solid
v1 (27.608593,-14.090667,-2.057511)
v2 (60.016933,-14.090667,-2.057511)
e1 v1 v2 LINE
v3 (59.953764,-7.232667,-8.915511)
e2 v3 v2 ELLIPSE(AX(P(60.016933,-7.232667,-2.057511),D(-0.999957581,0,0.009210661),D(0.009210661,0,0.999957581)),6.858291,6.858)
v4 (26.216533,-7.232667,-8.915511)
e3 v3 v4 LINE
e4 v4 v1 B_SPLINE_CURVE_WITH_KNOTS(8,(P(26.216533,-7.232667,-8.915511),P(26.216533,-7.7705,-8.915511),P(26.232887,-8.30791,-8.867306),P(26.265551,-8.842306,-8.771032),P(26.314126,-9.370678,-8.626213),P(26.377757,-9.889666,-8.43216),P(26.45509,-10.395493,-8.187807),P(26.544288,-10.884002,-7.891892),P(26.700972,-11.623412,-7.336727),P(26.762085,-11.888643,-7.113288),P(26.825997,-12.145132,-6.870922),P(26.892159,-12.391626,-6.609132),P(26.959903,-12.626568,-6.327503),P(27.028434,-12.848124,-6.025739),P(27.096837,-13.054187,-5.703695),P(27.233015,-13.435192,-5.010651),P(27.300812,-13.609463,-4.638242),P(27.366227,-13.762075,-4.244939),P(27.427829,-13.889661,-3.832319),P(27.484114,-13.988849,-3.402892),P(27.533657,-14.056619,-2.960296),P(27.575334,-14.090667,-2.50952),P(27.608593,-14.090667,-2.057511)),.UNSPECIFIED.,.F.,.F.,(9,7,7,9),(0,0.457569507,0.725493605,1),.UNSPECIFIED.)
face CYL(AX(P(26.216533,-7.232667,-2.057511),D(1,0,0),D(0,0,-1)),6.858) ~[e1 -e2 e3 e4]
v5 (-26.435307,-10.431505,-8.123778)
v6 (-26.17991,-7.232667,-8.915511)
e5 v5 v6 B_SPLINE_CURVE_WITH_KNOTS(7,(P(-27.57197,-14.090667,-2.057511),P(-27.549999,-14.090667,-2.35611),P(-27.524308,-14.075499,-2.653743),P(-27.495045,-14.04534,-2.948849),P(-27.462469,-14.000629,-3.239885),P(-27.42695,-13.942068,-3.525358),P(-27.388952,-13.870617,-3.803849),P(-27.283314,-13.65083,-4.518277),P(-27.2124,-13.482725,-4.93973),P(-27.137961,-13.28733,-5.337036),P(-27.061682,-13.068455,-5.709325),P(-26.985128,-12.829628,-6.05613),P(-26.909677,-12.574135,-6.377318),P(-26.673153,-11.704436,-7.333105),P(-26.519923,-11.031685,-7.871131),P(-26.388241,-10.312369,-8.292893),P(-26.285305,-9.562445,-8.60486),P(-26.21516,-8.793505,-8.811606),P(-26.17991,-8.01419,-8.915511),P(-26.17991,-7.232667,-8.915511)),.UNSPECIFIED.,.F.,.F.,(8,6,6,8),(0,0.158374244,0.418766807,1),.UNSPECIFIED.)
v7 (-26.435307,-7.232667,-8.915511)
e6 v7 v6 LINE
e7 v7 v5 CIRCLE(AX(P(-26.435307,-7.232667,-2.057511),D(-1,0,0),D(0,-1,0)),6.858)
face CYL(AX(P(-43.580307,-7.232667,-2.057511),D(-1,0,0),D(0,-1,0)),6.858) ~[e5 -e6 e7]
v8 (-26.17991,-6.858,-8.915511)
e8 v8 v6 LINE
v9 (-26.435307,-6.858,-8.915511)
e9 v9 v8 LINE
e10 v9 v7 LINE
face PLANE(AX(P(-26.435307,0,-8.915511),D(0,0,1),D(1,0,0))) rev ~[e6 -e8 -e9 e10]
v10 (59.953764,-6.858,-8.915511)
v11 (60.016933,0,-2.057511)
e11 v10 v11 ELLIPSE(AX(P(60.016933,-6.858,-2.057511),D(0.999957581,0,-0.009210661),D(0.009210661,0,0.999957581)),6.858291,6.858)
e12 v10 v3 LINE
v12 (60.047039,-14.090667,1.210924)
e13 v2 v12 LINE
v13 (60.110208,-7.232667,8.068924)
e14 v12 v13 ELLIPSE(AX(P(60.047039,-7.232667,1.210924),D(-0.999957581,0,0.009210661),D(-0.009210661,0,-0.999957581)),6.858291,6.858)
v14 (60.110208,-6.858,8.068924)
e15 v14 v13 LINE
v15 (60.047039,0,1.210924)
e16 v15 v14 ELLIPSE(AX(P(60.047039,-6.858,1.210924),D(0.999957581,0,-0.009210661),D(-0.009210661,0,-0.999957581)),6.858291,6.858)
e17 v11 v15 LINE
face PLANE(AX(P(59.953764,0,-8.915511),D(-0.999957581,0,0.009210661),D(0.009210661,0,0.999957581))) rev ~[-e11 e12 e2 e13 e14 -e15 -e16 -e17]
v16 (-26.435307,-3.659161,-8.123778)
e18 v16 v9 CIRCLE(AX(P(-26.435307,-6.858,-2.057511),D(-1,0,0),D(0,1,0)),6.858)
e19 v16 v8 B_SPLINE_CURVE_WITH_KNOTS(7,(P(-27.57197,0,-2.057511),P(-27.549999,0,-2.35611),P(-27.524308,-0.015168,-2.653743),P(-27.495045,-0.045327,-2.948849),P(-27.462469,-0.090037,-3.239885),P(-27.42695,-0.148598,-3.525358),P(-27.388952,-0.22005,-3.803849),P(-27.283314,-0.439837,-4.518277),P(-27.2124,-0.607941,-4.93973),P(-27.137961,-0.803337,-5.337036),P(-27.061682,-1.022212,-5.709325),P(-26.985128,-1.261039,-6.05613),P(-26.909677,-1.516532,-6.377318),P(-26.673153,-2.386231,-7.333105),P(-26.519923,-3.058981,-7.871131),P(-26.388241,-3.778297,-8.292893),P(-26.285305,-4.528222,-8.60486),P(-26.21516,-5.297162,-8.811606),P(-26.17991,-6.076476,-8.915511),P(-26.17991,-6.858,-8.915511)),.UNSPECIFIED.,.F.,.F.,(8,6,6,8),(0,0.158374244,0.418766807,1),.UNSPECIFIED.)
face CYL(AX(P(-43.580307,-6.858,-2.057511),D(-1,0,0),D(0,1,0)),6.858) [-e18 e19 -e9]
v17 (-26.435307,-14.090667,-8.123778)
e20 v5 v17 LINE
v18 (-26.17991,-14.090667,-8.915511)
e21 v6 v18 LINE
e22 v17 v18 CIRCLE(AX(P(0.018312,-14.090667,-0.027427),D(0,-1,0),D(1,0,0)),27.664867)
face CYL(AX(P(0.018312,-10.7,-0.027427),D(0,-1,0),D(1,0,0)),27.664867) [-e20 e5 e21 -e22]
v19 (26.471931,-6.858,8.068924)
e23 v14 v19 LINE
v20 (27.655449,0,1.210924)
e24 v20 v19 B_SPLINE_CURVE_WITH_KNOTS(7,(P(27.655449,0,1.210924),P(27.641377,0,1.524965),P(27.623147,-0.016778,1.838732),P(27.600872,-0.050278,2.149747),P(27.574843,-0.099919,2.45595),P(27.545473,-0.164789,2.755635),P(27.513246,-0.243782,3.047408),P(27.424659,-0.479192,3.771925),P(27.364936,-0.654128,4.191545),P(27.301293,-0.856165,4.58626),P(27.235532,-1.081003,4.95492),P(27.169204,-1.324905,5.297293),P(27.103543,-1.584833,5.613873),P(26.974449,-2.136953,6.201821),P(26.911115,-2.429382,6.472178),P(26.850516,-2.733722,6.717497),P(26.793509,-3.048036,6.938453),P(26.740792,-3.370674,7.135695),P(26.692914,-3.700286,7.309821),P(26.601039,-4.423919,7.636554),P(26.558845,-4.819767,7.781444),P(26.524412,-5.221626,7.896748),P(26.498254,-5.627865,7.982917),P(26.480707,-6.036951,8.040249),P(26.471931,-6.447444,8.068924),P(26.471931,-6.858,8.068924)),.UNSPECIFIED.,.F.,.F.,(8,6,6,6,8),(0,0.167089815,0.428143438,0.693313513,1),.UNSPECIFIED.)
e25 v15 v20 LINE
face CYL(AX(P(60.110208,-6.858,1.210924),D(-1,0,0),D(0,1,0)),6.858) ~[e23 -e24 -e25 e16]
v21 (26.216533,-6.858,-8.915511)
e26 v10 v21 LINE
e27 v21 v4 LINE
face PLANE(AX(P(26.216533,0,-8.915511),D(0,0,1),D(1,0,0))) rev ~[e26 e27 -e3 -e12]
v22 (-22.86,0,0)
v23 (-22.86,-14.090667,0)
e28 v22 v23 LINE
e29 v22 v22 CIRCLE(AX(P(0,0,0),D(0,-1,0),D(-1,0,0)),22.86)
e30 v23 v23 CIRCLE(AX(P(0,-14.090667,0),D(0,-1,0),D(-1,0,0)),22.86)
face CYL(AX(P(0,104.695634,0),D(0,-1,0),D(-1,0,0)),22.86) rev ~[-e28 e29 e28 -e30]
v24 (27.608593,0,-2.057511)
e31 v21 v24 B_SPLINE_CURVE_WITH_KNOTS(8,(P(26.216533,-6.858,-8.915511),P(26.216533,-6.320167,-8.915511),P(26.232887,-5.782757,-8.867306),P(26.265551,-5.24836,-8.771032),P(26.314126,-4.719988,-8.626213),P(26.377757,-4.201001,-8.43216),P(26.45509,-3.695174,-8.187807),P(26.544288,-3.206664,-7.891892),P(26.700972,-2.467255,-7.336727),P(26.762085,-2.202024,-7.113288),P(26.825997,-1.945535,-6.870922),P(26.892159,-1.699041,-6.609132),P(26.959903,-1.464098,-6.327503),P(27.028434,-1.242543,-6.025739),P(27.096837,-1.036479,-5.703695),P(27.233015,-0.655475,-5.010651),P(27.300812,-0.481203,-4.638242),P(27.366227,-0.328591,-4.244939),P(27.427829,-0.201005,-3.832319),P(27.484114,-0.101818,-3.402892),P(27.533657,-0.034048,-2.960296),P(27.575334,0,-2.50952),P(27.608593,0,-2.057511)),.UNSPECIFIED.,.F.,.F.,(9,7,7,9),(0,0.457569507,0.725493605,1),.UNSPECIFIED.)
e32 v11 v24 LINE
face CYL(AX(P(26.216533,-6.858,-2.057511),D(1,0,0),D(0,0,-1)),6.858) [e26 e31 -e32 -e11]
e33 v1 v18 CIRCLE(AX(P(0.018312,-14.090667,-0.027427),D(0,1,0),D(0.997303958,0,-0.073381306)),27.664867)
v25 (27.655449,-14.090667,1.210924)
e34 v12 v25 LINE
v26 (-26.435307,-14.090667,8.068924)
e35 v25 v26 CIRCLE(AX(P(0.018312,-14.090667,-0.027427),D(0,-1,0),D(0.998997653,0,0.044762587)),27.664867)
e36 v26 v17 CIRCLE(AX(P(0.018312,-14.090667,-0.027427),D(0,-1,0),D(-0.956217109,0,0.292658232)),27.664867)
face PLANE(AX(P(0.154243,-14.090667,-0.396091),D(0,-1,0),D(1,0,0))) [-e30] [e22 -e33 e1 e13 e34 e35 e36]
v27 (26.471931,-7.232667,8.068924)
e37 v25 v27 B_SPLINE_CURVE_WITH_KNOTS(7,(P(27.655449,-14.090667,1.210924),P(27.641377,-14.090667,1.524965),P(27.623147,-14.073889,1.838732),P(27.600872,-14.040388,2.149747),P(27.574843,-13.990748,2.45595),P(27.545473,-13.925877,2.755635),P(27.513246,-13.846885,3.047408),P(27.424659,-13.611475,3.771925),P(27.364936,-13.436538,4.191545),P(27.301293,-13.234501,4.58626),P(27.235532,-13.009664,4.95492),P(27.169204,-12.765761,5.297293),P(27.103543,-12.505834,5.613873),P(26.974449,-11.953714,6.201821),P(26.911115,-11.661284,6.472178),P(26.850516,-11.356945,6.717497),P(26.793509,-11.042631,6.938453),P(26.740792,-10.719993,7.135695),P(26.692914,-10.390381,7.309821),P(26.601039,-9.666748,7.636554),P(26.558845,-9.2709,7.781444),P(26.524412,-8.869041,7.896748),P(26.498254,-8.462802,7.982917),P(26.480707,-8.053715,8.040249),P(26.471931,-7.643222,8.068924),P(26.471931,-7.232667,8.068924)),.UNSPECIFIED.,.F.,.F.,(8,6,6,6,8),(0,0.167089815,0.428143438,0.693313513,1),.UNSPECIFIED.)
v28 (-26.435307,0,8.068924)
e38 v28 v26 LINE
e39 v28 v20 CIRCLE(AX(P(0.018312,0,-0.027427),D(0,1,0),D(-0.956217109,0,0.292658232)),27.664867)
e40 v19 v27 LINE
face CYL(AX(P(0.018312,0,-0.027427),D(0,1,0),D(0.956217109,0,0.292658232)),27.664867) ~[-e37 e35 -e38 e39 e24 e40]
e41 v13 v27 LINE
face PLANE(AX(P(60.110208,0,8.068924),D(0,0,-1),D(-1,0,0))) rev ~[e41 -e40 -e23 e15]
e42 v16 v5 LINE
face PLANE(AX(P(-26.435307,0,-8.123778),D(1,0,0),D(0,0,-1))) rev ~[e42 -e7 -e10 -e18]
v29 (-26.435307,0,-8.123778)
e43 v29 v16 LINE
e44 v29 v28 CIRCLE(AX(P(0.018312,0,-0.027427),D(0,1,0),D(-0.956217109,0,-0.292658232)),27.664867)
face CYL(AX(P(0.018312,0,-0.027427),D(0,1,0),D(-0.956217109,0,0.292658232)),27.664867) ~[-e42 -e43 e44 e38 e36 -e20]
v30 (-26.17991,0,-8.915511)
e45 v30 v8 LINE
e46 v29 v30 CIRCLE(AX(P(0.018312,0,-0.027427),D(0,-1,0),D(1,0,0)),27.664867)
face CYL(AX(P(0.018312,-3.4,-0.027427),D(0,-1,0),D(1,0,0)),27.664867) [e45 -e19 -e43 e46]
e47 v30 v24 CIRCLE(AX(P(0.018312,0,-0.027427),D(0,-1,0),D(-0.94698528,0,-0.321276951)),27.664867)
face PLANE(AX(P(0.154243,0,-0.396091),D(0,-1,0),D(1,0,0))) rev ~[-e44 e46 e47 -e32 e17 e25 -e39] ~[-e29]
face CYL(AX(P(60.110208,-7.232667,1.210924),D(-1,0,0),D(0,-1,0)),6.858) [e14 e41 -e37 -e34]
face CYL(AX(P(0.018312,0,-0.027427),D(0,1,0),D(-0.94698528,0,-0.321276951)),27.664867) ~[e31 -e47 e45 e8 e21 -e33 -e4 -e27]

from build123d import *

# Parameters (mm, degrees)
F1_DEPTH     = 14.0906665474
F3_D         = 45.72
F4_R         = 6.858
F5_T4_DEPTH  = 103.1253973126
F5_S5_R      = 27.6648668559
F5_T6_DEPTH  = 53
F5_T10_DEPTH = 103.1253973126
F5_S11_R     = 27.6648668559
F5_T12_DEPTH = 53


# Not quite as in the source:
# - a fillet or chamfer that OpenCascade refuses, or shapes differently, is made with other operations: its cross-section is extruded or revolved along the edge and cut away or added


with BuildPart() as f1:
    # F0 (on Front) → F1 (new body)
    with BuildSketch(Plane.XZ):
        with BuildLine():
            ThreePointArc((26.2165333562, -8.9155114296), (27.3140546761, -4.5315667493), (27.6831785203, -0.0274273648))
            ThreePointArc((27.6831785203, -0.0274273648), (27.3786909177, 4.0657993906), (26.4719306688, 8.0689236483))
            Line((26.4719306688, 8.0689236483), (-26.4353073399, 8.0689236483))
            Line((-26.4353073399, 8.0689236483), (-26.4353073399, -8.1237783779))
            ThreePointArc((-26.4353073399, -8.1237783779), (-26.3105848654, -8.5206049607), (-26.1799100273, -8.9155114296))
            Line((-26.1799100273, -8.9155114296), (26.2165333562, -8.9155114296))
        make_face()
        with BuildLine():
            ThreePointArc((26.4719306688, 8.0689236483), (27.3786909177, 4.0657993906), (27.6831785203, -0.0274273648))
            ThreePointArc((27.6831785203, -0.0274273648), (27.3140546761, -4.5315667493), (26.2165333562, -8.9155114296))
            Line((26.2165333562, -8.9155114296), (59.9537639373, -8.9155114296))
            Line((59.9537639373, -8.9155114296), (60.1102084538, 8.0689236483))
            Line((60.1102084538, 8.0689236483), (26.4719306688, 8.0689236483))
        make_face()
        with BuildLine():
            Line((-26.4353073399, 8.0689236483), (26.4719306688, 8.0689236483))
            ThreePointArc((26.4719306688, 8.0689236483), (0.0183116645, 27.6374394911), (-26.4353073399, 8.0689236483))
        make_face()
        with BuildLine():
            ThreePointArc((-26.1799100273, -8.9155114296), (0.0183116645, -27.6922942207), (26.2165333562, -8.9155114296))
            Line((26.2165333562, -8.9155114296), (-26.1799100273, -8.9155114296))
        make_face()
        with BuildLine():
            Line((-26.4353073399, -8.1237783779), (-26.4353073399, 8.0689236483))
            ThreePointArc((-26.4353073399, 8.0689236483), (-27.6465551914, -0.0274273648), (-26.4353073399, -8.1237783779))
        make_face()
        with BuildLine():
            Line((-26.4353073399, -8.9155114296), (-26.1799100273, -8.9155114296))
            ThreePointArc((-26.1799100273, -8.9155114296), (-26.3105848654, -8.5206049607), (-26.4353073399, -8.1237783779))
            Line((-26.4353073399, -8.1237783779), (-26.4353073399, -8.9155114296))
        make_face()
    extrude(amount=F1_DEPTH)

    # F3 (through all)
    with Locations(Plane(origin=(0, 0, 0), x_dir=(1, 0, 0), z_dir=(0, 1, 0))):
        with Locations((0, 0)):
            Hole(F3_D / 2)

    # F4
    f4_edges = [f1.edges().sort_by_distance(p)[0] for p in [
        (43.085149, -14.090667, -8.915511),
        (43.085149, 0, -8.915511),
        (43.29107, -14.090667, 8.068924),
        (43.29107, 0, 8.068924),
    ]]
    fillet(f4_edges, radius=F4_R)

    # F5: fillet of radius 6.858 on 2 edges, made by hand


with BuildPart() as f5_tool2:
    # F5_s3 → F5_t4 (new body)
    with BuildSketch(Plane.YZ.offset(-43.5803073399)):
        with BuildLine():
            ThreePointArc((-14.0906665474, -2.0575114296), (-12.0820048528, -6.906849735), (-7.2326665474, -8.9155114296))
            Line((-7.2326665474, -8.9155114296), (-14.0906665474, -8.9155114296))
            Line((-14.0906665474, -8.9155114296), (-14.0906665474, -2.0575114296))
        make_face()
    extrude(amount=F5_T4_DEPTH)

    # F5_s5 → F5_t6 (cut, symmetric)
    with BuildSketch(Plane.XZ.offset(10.7)):
        with Locations((0.0183116645, -0.0274273648)):
            Circle(F5_S5_R)
    extrude(amount=F5_T6_DEPTH, both=True, mode=Mode.SUBTRACT)


with BuildPart() as f1_1:
    add(f1.part)

    # F5_t1: cut F5_tool2
    add(f5_tool2.part, mode=Mode.SUBTRACT)


with BuildPart() as f5_tool8:
    # F5_s9 → F5_t10 (new body)
    with BuildSketch(Plane.YZ.offset(-43.5803073399)):
        with BuildLine():
            ThreePointArc((0, -2.0575114296), (-2.0086616946, -6.906849735), (-6.858, -8.9155114296))
            Line((-6.858, -8.9155114296), (0, -8.9155114296))
            Line((0, -8.9155114296), (0, -2.0575114296))
        make_face()
    extrude(amount=F5_T10_DEPTH)

    # F5_s11 → F5_t12 (cut, symmetric)
    with BuildSketch(Plane.XZ.offset(3.4)):
        with Locations((0.0183116645, -0.0274273648)):
            Circle(F5_S11_R)
    extrude(amount=F5_T12_DEPTH, both=True, mode=Mode.SUBTRACT)


with BuildPart() as f1_2:
    add(f1_1.part)

    # F5_t7: cut F5_tool8
    add(f5_tool8.part, mode=Mode.SUBTRACT)


solid = f1_2.part
